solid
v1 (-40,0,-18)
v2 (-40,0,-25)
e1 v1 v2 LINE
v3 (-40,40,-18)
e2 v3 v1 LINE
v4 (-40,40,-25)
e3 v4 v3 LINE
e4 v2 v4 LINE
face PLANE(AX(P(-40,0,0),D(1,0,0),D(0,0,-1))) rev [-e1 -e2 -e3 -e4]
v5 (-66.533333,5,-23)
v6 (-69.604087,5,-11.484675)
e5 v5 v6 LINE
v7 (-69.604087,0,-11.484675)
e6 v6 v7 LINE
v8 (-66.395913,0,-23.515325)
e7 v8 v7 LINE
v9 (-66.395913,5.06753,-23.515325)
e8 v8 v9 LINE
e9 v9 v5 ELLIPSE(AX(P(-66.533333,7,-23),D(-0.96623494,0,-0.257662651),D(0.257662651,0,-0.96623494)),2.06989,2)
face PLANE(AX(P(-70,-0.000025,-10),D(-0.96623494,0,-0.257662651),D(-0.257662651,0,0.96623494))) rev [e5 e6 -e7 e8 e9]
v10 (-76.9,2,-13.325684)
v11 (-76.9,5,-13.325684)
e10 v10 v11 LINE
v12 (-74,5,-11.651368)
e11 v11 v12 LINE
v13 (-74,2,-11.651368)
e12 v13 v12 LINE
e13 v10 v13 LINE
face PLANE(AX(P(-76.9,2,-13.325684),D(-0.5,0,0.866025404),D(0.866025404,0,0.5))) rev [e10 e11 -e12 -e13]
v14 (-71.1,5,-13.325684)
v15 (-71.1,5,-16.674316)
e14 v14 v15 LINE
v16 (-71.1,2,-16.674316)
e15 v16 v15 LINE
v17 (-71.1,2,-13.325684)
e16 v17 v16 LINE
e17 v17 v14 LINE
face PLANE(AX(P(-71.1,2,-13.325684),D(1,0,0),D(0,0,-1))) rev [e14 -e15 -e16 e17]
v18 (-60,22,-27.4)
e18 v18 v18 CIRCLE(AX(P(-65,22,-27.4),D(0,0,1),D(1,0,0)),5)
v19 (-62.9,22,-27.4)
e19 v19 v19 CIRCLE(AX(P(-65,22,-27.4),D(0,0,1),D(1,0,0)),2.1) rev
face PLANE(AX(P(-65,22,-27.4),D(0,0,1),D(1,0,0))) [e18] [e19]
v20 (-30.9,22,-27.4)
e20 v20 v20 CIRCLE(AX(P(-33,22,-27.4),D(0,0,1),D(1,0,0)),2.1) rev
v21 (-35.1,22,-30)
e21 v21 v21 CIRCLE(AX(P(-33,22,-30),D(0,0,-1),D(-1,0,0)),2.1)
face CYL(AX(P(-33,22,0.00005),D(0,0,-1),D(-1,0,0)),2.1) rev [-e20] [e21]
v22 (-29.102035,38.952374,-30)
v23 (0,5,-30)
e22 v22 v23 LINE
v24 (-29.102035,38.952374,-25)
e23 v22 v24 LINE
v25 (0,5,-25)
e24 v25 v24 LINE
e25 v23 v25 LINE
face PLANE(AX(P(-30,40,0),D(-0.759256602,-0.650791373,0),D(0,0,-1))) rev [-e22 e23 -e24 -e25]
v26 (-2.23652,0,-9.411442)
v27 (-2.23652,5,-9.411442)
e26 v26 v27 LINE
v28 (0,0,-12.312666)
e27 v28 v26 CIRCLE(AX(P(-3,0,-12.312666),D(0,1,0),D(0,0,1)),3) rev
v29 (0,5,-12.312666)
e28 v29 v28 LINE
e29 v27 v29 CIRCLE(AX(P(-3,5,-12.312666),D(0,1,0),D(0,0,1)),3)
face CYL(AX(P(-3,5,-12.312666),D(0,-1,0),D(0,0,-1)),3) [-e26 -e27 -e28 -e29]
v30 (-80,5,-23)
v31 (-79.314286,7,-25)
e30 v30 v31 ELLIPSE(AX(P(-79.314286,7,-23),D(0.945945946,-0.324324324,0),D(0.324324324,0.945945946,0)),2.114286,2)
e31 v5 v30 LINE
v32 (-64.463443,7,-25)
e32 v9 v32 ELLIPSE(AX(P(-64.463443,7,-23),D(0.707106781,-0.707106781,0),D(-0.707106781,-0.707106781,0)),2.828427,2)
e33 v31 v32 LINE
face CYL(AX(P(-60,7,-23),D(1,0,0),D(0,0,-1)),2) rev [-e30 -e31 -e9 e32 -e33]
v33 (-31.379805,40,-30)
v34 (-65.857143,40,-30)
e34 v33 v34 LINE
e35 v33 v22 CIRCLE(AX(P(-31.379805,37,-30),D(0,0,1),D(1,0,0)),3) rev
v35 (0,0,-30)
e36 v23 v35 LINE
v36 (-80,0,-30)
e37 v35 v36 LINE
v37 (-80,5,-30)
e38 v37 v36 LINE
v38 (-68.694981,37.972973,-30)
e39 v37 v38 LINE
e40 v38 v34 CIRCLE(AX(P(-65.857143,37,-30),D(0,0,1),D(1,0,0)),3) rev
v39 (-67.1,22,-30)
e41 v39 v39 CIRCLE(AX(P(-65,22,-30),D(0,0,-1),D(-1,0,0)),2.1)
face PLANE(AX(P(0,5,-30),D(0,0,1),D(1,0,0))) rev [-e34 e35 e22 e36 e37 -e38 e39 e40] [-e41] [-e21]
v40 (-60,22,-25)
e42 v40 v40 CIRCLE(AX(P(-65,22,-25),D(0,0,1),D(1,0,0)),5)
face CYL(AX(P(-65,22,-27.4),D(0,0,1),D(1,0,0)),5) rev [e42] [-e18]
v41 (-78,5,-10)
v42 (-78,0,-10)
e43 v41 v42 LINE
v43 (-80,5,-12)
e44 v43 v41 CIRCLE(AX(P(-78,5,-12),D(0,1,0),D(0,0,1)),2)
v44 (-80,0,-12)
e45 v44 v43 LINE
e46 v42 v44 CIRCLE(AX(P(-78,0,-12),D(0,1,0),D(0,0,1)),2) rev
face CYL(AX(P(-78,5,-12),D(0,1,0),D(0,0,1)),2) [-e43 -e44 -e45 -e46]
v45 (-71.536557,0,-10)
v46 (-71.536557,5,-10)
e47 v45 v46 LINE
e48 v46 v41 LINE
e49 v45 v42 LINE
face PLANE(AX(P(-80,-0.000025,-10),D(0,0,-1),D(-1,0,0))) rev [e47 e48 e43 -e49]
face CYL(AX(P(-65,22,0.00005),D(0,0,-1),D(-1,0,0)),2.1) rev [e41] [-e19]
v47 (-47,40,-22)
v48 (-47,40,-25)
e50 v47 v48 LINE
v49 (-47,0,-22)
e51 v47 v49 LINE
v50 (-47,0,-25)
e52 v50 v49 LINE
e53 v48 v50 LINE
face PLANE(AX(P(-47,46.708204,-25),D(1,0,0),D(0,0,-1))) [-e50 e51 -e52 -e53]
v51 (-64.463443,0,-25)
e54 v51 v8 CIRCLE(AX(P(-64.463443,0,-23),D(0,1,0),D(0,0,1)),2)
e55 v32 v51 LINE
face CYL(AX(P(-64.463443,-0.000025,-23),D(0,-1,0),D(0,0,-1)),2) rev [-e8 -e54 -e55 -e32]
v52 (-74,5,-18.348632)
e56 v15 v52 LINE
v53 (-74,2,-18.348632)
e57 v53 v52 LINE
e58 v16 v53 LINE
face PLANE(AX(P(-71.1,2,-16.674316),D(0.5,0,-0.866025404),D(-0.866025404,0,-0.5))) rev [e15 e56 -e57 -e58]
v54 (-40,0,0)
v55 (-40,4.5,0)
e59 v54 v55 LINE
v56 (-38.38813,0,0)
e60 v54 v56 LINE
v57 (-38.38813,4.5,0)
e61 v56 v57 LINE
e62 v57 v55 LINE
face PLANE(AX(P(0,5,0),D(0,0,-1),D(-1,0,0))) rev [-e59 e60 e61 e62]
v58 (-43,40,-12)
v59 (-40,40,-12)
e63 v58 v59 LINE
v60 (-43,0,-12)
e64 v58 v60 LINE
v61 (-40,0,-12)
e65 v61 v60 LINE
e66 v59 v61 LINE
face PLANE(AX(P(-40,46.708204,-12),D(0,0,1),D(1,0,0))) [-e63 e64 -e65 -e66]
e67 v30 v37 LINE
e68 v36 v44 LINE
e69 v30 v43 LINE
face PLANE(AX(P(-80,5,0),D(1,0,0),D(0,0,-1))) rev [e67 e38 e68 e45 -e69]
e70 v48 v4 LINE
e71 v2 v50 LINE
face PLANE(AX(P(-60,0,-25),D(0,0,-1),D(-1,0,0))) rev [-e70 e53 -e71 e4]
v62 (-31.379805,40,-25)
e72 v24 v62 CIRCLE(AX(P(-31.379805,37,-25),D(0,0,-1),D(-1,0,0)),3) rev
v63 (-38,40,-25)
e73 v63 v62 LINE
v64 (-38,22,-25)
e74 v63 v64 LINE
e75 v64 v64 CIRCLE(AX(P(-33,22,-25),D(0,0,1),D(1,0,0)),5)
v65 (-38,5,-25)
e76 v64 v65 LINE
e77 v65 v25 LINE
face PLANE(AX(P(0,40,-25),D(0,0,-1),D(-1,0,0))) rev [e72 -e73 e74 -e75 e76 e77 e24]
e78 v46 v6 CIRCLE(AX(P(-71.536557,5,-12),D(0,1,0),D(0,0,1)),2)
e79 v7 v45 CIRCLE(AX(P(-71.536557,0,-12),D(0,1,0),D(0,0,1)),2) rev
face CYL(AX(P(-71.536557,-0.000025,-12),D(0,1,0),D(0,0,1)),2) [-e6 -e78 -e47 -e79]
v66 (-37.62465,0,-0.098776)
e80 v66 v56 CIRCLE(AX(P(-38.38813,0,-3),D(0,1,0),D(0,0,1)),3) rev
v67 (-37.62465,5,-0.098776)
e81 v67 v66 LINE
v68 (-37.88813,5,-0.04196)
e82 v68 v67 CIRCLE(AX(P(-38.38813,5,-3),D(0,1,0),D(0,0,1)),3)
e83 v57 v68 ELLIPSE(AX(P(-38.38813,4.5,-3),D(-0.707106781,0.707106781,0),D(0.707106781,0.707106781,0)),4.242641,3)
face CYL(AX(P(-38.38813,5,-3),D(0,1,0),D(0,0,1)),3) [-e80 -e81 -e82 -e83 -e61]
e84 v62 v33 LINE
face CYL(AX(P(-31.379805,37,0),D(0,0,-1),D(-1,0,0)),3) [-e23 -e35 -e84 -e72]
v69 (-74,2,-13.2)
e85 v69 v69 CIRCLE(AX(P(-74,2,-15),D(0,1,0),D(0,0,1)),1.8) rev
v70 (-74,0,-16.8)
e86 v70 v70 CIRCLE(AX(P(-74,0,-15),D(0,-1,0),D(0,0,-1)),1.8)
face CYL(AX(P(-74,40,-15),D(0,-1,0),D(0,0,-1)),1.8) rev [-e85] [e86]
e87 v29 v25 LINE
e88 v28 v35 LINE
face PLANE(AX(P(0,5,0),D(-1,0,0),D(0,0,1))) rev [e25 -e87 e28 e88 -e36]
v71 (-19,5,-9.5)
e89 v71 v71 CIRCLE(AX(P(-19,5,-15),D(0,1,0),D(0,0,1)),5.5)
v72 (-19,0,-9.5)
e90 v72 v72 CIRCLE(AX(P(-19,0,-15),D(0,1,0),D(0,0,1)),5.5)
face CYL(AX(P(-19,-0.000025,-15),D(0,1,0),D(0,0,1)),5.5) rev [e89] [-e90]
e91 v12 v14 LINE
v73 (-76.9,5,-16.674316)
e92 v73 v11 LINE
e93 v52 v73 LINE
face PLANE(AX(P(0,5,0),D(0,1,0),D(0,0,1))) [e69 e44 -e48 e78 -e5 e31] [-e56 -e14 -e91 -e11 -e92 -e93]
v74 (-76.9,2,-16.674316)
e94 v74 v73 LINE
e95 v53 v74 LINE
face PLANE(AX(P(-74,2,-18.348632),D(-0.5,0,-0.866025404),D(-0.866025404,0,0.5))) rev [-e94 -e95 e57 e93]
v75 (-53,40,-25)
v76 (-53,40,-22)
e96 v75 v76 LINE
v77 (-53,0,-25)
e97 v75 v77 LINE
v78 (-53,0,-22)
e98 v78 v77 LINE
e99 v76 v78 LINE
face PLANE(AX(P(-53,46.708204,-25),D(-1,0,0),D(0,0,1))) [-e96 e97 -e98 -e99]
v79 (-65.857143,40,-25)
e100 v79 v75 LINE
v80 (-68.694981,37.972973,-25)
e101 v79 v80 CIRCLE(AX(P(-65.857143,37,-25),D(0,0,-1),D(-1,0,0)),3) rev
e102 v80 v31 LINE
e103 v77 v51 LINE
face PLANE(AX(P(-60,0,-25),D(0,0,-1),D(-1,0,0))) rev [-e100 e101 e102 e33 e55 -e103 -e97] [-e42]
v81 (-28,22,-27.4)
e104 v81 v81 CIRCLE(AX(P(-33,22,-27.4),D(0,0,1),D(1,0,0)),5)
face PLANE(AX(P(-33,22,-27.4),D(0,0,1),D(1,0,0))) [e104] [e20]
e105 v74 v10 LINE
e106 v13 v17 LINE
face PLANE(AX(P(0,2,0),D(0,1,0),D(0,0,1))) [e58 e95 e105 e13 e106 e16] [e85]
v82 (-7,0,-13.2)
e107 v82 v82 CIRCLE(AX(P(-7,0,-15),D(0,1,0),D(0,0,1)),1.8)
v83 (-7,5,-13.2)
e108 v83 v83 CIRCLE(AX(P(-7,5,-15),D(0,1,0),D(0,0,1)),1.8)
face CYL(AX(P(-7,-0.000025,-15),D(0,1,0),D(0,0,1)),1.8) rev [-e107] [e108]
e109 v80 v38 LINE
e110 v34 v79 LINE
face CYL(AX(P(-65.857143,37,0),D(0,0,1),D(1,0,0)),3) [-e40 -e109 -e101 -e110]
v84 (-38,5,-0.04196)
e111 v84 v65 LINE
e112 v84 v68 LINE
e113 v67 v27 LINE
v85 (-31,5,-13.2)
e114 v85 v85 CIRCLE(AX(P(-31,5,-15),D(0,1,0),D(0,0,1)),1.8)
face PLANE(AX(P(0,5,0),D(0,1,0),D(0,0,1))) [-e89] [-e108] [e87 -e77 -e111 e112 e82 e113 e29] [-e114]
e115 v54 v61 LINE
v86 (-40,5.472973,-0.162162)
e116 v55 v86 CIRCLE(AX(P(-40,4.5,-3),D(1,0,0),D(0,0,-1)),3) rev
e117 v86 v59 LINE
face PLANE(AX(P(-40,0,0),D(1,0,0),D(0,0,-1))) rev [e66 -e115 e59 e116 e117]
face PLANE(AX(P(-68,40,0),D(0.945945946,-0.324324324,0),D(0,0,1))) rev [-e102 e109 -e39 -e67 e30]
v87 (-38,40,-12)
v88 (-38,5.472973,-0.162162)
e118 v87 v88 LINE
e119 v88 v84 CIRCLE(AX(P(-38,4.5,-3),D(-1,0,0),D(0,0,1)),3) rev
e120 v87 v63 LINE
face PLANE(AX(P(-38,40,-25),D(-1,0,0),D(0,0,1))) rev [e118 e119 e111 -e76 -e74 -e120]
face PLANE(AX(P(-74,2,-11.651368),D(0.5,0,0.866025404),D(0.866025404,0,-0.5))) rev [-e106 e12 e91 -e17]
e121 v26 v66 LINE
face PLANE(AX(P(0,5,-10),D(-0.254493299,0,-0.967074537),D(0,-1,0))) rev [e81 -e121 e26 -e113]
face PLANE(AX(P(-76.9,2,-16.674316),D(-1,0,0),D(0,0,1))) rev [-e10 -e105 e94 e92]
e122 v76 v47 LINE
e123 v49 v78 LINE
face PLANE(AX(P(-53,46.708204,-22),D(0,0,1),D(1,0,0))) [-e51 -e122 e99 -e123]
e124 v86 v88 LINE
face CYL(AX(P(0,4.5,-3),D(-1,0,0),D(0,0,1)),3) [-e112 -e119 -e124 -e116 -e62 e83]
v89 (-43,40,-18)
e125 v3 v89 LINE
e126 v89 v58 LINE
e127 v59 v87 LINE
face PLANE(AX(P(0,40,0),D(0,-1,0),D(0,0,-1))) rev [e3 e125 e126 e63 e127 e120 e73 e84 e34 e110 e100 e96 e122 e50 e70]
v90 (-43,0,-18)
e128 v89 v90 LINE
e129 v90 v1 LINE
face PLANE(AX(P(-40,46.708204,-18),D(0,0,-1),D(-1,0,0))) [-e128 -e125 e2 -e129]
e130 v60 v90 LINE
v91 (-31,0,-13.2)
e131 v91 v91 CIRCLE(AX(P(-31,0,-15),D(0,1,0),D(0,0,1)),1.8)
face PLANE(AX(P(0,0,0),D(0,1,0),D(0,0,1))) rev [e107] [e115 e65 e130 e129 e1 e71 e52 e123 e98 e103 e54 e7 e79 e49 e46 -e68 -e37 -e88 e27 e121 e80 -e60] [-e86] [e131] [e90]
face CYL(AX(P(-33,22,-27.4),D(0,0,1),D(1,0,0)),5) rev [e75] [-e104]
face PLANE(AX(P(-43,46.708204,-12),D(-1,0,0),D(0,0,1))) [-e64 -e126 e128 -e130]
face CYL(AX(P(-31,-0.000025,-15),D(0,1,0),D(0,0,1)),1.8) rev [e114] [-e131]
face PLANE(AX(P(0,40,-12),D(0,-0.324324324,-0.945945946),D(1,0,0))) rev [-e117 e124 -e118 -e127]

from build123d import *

# Parameters (mm, degrees)
SKETCH1_W           = 80
SKETCH1_H           = 30
BOSS_EXTRUDE1_DEPTH = 5
SKETCH2_W           = 20
SKETCH2_H           = 25
CUT_EXTRUDE1_DEPTH  = 86.586213843
BOSS_EXTRUDE2_DEPTH = 35
SKETCH4_R           = 5.5
SKETCH4_R_2         = 1.8
CUT_EXTRUDE2_DEPTH  = 93.330926563
CHAMFER1_SIZE       = 38
CHAMFER1_SIZE2      = 10
FILLET1_R           = 3
SKETCH5_R           = 2.1
CUT_EXTRUDE3_DEPTH  = 95.339811321
SKETCH6_R           = 5
CUT_EXTRUDE4_DEPTH  = 2.4
CHAMFER2_SIZE       = 35
CHAMFER2_SIZE2      = 30
FILLET2_R           = 3
SKETCH7_W           = 6
SKETCH7_H           = 3
SKETCH7_W_2         = 3
SKETCH7_H_2         = 6
BOSS_EXTRUDE3_DEPTH = 40
CHAMFER3_SIZE       = 35
CHAMFER3_SIZE2      = 12
FILLET3_R           = 3
CHAMFER4_SIZE       = 35
CHAMFER4_SIZE2      = 12
FILLET4_R           = 3
SKETCH8_R           = 1.8
CUT_EXTRUDE5_DEPTH  = 95.339811321
CUT_EXTRUDE6_DEPTH  = 93.330926563
FILLET5_R           = 2
CUT_EXTRUDE7_DEPTH  = 3


with BuildPart() as part:
    # Sketch1 → Boss-Extrude1 (new body)
    with BuildSketch(Plane(origin=(0, 0, 0), x_dir=(1, 0, 0), z_dir=(0, 1, 0))):
        with Locations((-40, 15)):
            Rectangle(SKETCH1_W, SKETCH1_H)
    extrude(amount=BOSS_EXTRUDE1_DEPTH)

    # Sketch2 → Cut-Extrude1 (cut, through all)
    with BuildSketch(Plane(origin=(0, 5, 0), x_dir=(1, 0, 0), z_dir=(0, 1, 0))):
        with Locations((-50, 12.5)):
            Rectangle(SKETCH2_W, SKETCH2_H)
    extrude(amount=-CUT_EXTRUDE1_DEPTH, mode=Mode.SUBTRACT)

    # Sketch3 → Boss-Extrude2 (add)
    with BuildSketch(Plane(origin=(0, 5, 0), x_dir=(1, 0, 0), z_dir=(0, 1, 0))):
        Polygon((-80, 30), (0, 30), (0, 25), (-38, 25), (-38, 0), (-40, 0), (-40, 25), (-80, 25), align=None)
    extrude(amount=BOSS_EXTRUDE2_DEPTH)

    # Sketch4 → Cut-Extrude2 (cut, through all)
    with BuildSketch(Plane(origin=(0, 5, 0), x_dir=(1, 0, 0), z_dir=(0, 1, 0))):
        with Locations(Location((-19, 15, 0), (0, 0, 270))):
            Circle(SKETCH4_R)
        with Locations(Location((-7, 15, 0), (0, 0, 270))):
            Circle(SKETCH4_R_2)
        with Locations(Location((-31, 15, 0), (0, 0, 270))):
            Circle(SKETCH4_R_2)
    extrude(amount=-CUT_EXTRUDE2_DEPTH, mode=Mode.SUBTRACT)

    # Chamfer1
    chamfer1_edges = [part.edges().sort_by_distance(p)[0] for p in [
        (0, 2.5, 0),
    ]]
    chamfer1_side = [part.faces().sort_by_distance(p)[0] for p in [
        (-20, 0.565685425, 0),
    ]]
    chamfer(chamfer1_edges, length=CHAMFER1_SIZE, length2=CHAMFER1_SIZE2, reference=chamfer1_side[0])

    # Fillet1
    fillet1_edges = [part.edges().sort_by_distance(p)[0] for p in [
        (0, 2.5, -10),
    ]]
    fillet(fillet1_edges, radius=FILLET1_R)

    # Sketch5 → Cut-Extrude3 (cut, through all)
    with BuildSketch(Plane(origin=(0, 0, -30), x_dir=(-1, 0, 0), z_dir=(0, 0, -1))):
        with Locations((33, 22)):
            Circle(SKETCH5_R)
        with Locations((65, 22)):
            Circle(SKETCH5_R)
    extrude(amount=-CUT_EXTRUDE3_DEPTH, mode=Mode.SUBTRACT)

    # Sketch6 → Cut-Extrude4 (cut)
    with BuildSketch(Plane.XY.offset(-25)):
        with Locations((-33, 22)):
            Circle(SKETCH6_R)
        with Locations((-65, 22)):
            Circle(SKETCH6_R)
    extrude(amount=-CUT_EXTRUDE4_DEPTH, mode=Mode.SUBTRACT)

    # Chamfer2
    chamfer2_edges = [part.edges().sort_by_distance(p)[0] for p in [
        (0, 40, -27.5),
    ]]
    chamfer2_side = [part.faces().sort_by_distance(p)[0] for p in [
        (0, 15.78592553, -25.370407315),
    ]]
    chamfer(chamfer2_edges, length=CHAMFER2_SIZE, length2=CHAMFER2_SIZE2, reference=chamfer2_side[0])

    # Fillet2
    fillet2_edges = [part.edges().sort_by_distance(p)[0] for p in [
        (-30, 40, -27.5),
    ]]
    fillet(fillet2_edges, radius=FILLET2_R)

    # Sketch7 → Boss-Extrude3 (add)
    with BuildSketch(Plane.XZ):
        with Locations((-50, -23.5)):
            Rectangle(SKETCH7_W, SKETCH7_H)
        with Locations((-41.5, -15)):
            Rectangle(SKETCH7_W_2, SKETCH7_H_2)
    extrude(amount=-BOSS_EXTRUDE3_DEPTH)

    # Chamfer3
    chamfer3_edges = [part.edges().sort_by_distance(p)[0] for p in [
        (-39, 40, 0),
    ]]
    chamfer3_side = [part.faces().sort_by_distance(p)[0] for p in [
        (-39, 20, 0),
    ]]
    chamfer(chamfer3_edges, length=CHAMFER3_SIZE, length2=CHAMFER3_SIZE2, reference=chamfer3_side[0])

    # Fillet3
    # the kernel refuses this fillet: 3 mm, written as the material it takes off along each edge
    with BuildSketch(Plane(origin=(-36.75, 5, 0), x_dir=(0, 0.945945945945946, -0.3243243243243238), z_dir=(-1, 0, 0))) as fillet3_piece_1:
        with BuildLine():
            CenterArc((FILLET3_R * 0.166666666667, FILLET3_R), FILLET3_R, 251.075355584, 18.924644416)
            Line((-FILLET3_R * 0.157657657658, FILLET3_R * 0.0540540540541), (0, 0))
            Line((0, 0), (FILLET3_R * 0.166666666667, 0))
        make_face()
    extrude(amount=4.5, mode=Mode.SUBTRACT)
    with BuildSketch(Plane(origin=(-38, -0.970324057, 0), x_dir=(-1, 0, 0), z_dir=(0, 1, 0))) as fillet3_piece_2:
        with BuildLine():
            CenterArc((FILLET3_R * 0.129376540878, -FILLET3_R), FILLET3_R, 90, 14.743562836)
            Line((-FILLET3_R * 0.125116758402, -FILLET3_R * 0.0329254627374), (0, 0))
            Line((0, 0), (FILLET3_R * 0.129376540878, 0))
        make_face()
    extrude(amount=6.940648113, mode=Mode.SUBTRACT)

    # Chamfer4
    chamfer4_edges = [part.edges().sort_by_distance(p)[0] for p in [
        (-80, 40, -27.5),
    ]]
    chamfer4_side = [part.faces().sort_by_distance(p)[0] for p in [
        (-80, 2.5, -0.5),
    ]]
    chamfer(chamfer4_edges, length=CHAMFER4_SIZE, length2=CHAMFER4_SIZE2, reference=chamfer4_side[0])

    # Fillet4
    fillet4_edges = [part.edges().sort_by_distance(p)[0] for p in [
        (-68, 40, -27.5),
    ]]
    fillet(fillet4_edges, radius=FILLET4_R)

    # Sketch8 → Cut-Extrude5 (cut, through all)
    with BuildSketch(Plane.XZ):
        with Locations(Location((-74, -15, 0), (0, 0, 270))):
            Circle(SKETCH8_R)
    extrude(amount=-CUT_EXTRUDE5_DEPTH, mode=Mode.SUBTRACT)

    # Sketch9 → Cut-Extrude6 (cut, through all)
    with BuildSketch(Plane(origin=(0, 5, 0), x_dir=(1, 0, 0), z_dir=(0, 1, 0))):
        Polygon((-80, 10), (-70, 10), (-66, 25), (-60, 25), (-60, 0), (-80, 0), align=None)
    extrude(amount=-CUT_EXTRUDE6_DEPTH, mode=Mode.SUBTRACT)

    # Fillet5
    fillet5_edges = [part.edges().sort_by_distance(p)[0] for p in [
        (-80, 2.5, -10),
        (-70, 2.5, -10),
        (-66, 2.5, -25),
        (-73, 5, -25),
    ]]
    fillet(fillet5_edges, radius=FILLET5_R)

    # Sketch10 → Cut-Extrude7 (cut)
    with BuildSketch(Plane(origin=(0, 5, 0), x_dir=(1, 0, 0), z_dir=(0, 1, 0))):
        Polygon((-71.1, 13.325684219), (-71.1, 16.674315781), (-74, 18.348631561), (-76.9, 16.674315781), (-76.9, 13.325684219), (-74, 11.651368439), align=None)
    extrude(amount=-CUT_EXTRUDE7_DEPTH, mode=Mode.SUBTRACT)


solid = part.part
